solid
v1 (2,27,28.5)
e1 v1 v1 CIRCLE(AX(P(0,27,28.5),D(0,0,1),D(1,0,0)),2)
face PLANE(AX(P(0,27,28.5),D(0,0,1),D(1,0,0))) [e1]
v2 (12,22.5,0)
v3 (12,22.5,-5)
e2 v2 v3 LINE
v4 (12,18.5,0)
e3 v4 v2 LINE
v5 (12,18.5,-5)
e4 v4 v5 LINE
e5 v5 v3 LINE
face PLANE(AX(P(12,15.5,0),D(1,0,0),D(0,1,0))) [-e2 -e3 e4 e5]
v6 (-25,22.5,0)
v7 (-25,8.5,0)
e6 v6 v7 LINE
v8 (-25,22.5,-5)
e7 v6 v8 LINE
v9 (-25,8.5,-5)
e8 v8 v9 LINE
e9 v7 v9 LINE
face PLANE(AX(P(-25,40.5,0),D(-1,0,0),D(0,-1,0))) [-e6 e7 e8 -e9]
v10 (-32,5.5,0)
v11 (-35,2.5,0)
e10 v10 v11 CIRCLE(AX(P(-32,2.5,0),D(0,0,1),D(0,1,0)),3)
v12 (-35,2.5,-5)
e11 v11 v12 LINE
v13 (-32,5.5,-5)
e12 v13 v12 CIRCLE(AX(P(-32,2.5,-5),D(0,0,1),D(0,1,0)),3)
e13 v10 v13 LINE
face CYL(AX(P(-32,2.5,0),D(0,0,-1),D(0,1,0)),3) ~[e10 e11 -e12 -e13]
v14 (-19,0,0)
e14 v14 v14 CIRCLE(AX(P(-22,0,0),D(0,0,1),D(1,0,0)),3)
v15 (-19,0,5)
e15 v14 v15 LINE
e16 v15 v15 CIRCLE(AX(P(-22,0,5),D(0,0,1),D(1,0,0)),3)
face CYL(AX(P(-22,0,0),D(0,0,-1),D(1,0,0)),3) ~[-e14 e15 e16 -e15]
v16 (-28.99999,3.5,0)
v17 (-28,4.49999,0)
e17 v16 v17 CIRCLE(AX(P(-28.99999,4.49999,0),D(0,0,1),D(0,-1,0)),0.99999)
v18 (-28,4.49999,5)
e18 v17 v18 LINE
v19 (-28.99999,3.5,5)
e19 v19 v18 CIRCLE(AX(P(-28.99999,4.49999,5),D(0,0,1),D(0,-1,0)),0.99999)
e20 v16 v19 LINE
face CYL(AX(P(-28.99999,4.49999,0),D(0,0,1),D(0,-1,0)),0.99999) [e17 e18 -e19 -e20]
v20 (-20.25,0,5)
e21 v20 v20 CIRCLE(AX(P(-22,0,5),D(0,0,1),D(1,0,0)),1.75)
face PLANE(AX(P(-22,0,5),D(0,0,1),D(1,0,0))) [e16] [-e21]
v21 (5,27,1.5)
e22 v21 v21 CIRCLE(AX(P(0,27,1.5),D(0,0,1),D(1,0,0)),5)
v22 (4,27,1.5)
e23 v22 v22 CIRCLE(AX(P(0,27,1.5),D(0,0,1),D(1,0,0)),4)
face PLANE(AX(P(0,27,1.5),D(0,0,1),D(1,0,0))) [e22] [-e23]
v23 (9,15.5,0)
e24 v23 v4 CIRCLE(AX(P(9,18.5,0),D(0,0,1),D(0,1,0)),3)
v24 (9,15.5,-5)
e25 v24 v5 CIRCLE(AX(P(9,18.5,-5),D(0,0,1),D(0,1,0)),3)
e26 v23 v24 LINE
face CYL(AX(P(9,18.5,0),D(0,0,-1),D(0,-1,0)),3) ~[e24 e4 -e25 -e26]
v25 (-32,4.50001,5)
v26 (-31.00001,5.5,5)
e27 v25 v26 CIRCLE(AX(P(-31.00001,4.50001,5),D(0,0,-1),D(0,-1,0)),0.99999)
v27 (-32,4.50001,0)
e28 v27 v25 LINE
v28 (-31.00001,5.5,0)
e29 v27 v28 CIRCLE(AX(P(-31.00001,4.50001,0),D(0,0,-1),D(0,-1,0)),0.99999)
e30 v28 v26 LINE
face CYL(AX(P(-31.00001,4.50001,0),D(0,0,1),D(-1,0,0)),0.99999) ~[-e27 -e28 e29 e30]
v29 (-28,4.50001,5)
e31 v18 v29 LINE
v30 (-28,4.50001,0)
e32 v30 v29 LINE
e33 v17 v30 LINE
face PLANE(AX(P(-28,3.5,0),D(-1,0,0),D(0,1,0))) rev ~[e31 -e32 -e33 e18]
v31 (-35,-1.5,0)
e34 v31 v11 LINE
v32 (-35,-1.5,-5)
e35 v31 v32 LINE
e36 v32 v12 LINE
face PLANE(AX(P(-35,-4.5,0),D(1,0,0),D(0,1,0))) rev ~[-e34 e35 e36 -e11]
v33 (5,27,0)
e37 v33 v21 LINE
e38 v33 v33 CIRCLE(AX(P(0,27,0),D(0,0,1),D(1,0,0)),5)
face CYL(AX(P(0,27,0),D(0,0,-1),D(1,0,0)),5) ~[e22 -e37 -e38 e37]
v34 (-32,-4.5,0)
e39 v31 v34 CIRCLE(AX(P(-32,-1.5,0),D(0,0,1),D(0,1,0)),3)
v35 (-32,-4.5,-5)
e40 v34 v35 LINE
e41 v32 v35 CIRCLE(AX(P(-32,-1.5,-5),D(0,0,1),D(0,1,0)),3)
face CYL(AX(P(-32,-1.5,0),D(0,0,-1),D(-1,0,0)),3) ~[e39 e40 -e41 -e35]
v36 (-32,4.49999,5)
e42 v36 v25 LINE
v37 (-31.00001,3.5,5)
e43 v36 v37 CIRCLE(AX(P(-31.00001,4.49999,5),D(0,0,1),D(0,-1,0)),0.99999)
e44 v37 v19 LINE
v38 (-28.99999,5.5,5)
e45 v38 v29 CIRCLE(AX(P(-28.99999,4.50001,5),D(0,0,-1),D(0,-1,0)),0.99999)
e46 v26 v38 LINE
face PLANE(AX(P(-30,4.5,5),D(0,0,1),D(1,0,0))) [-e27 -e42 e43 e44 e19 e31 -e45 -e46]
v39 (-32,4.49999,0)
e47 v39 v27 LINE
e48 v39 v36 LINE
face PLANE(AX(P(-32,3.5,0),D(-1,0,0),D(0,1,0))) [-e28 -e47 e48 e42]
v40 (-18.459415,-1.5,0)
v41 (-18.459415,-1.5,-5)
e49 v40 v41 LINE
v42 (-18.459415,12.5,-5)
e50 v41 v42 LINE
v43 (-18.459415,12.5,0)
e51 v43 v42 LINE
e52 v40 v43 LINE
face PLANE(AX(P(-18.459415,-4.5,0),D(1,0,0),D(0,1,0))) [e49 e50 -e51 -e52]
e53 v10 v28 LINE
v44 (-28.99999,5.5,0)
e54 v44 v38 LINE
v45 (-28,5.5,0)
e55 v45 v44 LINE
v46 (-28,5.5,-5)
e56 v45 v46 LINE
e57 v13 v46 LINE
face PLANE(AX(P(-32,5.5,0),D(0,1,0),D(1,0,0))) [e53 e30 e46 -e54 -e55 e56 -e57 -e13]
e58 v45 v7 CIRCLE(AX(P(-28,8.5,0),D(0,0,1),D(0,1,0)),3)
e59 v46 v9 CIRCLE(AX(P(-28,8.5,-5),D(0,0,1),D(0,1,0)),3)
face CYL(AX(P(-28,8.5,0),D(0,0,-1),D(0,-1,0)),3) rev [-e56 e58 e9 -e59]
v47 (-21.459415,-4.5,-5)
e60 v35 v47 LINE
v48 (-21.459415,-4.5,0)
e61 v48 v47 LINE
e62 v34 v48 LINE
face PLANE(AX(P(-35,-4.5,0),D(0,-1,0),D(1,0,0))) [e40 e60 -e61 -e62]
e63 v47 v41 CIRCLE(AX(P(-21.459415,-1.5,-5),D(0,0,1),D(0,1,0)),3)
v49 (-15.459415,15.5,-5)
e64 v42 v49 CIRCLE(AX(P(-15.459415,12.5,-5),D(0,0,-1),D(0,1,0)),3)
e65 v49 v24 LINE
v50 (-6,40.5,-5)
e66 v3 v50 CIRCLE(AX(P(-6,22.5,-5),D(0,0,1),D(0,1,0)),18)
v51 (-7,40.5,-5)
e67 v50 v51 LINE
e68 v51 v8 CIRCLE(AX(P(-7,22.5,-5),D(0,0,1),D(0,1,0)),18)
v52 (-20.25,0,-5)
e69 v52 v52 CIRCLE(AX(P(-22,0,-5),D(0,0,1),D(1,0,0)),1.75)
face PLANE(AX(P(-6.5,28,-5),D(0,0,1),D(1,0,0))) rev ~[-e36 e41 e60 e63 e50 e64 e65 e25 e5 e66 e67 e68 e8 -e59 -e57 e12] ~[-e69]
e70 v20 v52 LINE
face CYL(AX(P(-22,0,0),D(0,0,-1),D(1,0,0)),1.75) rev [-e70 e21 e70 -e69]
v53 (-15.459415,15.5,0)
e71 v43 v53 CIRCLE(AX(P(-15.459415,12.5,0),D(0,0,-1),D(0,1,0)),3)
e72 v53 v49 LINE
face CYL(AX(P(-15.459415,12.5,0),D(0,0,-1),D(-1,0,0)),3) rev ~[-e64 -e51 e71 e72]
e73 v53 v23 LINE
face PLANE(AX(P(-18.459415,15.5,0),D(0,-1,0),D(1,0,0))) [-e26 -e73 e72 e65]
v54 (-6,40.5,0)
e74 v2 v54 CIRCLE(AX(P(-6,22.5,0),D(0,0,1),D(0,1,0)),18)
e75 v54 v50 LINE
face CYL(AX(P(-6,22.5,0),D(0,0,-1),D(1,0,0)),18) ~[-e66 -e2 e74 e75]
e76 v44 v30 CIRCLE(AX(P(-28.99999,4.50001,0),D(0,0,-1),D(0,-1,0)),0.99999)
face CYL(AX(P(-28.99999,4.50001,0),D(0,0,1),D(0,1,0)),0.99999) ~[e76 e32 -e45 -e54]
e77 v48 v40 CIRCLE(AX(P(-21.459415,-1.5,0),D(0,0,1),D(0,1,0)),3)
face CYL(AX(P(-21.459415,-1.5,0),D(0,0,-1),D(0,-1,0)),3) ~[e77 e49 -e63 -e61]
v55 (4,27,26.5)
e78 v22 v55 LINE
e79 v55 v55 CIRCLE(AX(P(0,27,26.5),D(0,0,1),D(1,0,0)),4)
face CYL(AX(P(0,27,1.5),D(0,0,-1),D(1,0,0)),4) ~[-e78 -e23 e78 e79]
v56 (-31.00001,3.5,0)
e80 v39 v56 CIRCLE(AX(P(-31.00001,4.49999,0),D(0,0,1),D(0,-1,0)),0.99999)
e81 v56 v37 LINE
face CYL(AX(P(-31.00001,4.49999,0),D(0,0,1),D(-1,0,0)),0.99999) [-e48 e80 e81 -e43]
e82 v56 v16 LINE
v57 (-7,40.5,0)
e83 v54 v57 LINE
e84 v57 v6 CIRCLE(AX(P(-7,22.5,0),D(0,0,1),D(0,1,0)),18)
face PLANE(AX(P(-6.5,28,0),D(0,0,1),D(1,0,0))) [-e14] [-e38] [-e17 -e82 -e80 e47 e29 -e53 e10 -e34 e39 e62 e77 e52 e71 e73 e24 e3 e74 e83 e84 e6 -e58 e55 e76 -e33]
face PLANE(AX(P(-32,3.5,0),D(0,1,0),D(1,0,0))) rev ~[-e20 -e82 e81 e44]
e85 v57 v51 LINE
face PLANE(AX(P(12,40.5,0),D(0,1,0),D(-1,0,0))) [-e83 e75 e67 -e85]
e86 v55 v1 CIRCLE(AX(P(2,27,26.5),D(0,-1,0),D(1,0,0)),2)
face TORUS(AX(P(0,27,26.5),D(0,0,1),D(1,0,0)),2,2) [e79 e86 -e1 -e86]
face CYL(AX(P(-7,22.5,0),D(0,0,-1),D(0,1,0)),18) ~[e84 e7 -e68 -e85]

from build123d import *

# Parameters (mm, degrees)
F0_R      = 5
F0_R_2    = 1.75
F0_W      = 10
F0_H      = 10
F0_R_3    = 4
F1_DEPTH  = 5
F2_DEPTH  = 1.5
F3_R      = 4
F4_DEPTH  = 27
F5_R      = 2
F6_R      = 18
F7_R      = 3
F7_R_2    = 1.75
F8_DEPTH  = 5
F9_R      = 3
F10_W     = 4
F10_H     = 2
F11_DEPTH = 5
F12_R     = 0.99999


# Not quite as in the source:
# - a fillet or chamfer is up to 0.001 mm smaller than in the source, because OpenCascade refuses the exact size


with BuildPart() as f1:
    # F0 (on Top) → F1 (new body)
    with BuildSketch(Plane.XY):
        Polygon((-25, 15.5), (-18.459414942, 15.5), (12, 15.5), (12, 40.5), (-25, 40.5), align=None)
        with Locations((0, 27)):
            Circle(F0_R, mode=Mode.SUBTRACT)
        Polygon((-25, 5.5), (-25, -4.5), (-18.459414942, -4.5), (-18.459414942, 15.5), (-25, 15.5), align=None)
        with Locations((-22, 0)):
            Circle(F0_R_2, mode=Mode.SUBTRACT)
        with Locations((-30, 0.5)):
            Rectangle(F0_W, F0_H)
        with Locations((0, 27)):
            Circle(F0_R)
        with Locations((0, 27)):
            Circle(F0_R_3, mode=Mode.SUBTRACT)
        with Locations((0, 27)):
            Circle(F0_R_3)
    extrude(amount=-F1_DEPTH)

    # F0 (on Top) → F2 (join)
    with BuildSketch(Plane.XY):
        with Locations((0, 27)):
            Circle(F0_R)
        with Locations((0, 27)):
            Circle(F0_R_3, mode=Mode.SUBTRACT)
        with Locations((0, 27)):
            Circle(F0_R_3)
    extrude(amount=F2_DEPTH)

    # F3 (on face) → F4 (join)
    with BuildSketch(Plane.XY.offset(1.5)):
        with Locations((0, 27)):
            Circle(F3_R)
    extrude(amount=F4_DEPTH)

    # F5
    f5_edges = [f1.edges().sort_by_distance(p)[0] for p in [
        (-4, 27, 28.5),
    ]]
    fillet(f5_edges, radius=F5_R)

    # F6
    f6_edges = [f1.edges().sort_by_distance(p)[0] for p in [
        (-25, 40.5, -2.5),
        (12, 40.5, -2.5),
    ]]
    fillet(f6_edges, radius=F6_R)

    # F7 (on face) → F8 (join)
    with BuildSketch(Plane.XY):
        with Locations((-22, 0)):
            Circle(F7_R)
        with Locations((-22, 0)):
            Circle(F7_R_2, mode=Mode.SUBTRACT)
    extrude(amount=F8_DEPTH)

    # F9
    f9_edges = [f1.edges().sort_by_distance(p)[0] for p in [
        (-25, 5.5, -2.5),
        (-35, 5.5, -2.5),
        (-35, -4.5, -2.5),
        (-18.459415, -4.5, -2.5),
        (-18.459415, 15.5, -2.5),
        (12, 15.5, -2.5),
    ]]
    fillet(f9_edges, radius=F9_R)

    # F10 (on face) → F11 (join)
    with BuildSketch(Plane.XY):
        with Locations((-30, 4.5)):
            Rectangle(F10_W, F10_H)
    extrude(amount=F11_DEPTH)

    # F12 (radius 1 in the source; OpenCascade refuses exactly that, so slightly less here)
    f12_edges = [f1.edges().sort_by_distance(p)[0] for p in [
        (-32, 5.5, 2.5),
        (-32, 3.5, 2.5),
        (-28, 3.5, 2.5),
        (-28, 5.5, 2.5),
    ]]
    fillet(f12_edges, radius=F12_R)


solid = f1.part
